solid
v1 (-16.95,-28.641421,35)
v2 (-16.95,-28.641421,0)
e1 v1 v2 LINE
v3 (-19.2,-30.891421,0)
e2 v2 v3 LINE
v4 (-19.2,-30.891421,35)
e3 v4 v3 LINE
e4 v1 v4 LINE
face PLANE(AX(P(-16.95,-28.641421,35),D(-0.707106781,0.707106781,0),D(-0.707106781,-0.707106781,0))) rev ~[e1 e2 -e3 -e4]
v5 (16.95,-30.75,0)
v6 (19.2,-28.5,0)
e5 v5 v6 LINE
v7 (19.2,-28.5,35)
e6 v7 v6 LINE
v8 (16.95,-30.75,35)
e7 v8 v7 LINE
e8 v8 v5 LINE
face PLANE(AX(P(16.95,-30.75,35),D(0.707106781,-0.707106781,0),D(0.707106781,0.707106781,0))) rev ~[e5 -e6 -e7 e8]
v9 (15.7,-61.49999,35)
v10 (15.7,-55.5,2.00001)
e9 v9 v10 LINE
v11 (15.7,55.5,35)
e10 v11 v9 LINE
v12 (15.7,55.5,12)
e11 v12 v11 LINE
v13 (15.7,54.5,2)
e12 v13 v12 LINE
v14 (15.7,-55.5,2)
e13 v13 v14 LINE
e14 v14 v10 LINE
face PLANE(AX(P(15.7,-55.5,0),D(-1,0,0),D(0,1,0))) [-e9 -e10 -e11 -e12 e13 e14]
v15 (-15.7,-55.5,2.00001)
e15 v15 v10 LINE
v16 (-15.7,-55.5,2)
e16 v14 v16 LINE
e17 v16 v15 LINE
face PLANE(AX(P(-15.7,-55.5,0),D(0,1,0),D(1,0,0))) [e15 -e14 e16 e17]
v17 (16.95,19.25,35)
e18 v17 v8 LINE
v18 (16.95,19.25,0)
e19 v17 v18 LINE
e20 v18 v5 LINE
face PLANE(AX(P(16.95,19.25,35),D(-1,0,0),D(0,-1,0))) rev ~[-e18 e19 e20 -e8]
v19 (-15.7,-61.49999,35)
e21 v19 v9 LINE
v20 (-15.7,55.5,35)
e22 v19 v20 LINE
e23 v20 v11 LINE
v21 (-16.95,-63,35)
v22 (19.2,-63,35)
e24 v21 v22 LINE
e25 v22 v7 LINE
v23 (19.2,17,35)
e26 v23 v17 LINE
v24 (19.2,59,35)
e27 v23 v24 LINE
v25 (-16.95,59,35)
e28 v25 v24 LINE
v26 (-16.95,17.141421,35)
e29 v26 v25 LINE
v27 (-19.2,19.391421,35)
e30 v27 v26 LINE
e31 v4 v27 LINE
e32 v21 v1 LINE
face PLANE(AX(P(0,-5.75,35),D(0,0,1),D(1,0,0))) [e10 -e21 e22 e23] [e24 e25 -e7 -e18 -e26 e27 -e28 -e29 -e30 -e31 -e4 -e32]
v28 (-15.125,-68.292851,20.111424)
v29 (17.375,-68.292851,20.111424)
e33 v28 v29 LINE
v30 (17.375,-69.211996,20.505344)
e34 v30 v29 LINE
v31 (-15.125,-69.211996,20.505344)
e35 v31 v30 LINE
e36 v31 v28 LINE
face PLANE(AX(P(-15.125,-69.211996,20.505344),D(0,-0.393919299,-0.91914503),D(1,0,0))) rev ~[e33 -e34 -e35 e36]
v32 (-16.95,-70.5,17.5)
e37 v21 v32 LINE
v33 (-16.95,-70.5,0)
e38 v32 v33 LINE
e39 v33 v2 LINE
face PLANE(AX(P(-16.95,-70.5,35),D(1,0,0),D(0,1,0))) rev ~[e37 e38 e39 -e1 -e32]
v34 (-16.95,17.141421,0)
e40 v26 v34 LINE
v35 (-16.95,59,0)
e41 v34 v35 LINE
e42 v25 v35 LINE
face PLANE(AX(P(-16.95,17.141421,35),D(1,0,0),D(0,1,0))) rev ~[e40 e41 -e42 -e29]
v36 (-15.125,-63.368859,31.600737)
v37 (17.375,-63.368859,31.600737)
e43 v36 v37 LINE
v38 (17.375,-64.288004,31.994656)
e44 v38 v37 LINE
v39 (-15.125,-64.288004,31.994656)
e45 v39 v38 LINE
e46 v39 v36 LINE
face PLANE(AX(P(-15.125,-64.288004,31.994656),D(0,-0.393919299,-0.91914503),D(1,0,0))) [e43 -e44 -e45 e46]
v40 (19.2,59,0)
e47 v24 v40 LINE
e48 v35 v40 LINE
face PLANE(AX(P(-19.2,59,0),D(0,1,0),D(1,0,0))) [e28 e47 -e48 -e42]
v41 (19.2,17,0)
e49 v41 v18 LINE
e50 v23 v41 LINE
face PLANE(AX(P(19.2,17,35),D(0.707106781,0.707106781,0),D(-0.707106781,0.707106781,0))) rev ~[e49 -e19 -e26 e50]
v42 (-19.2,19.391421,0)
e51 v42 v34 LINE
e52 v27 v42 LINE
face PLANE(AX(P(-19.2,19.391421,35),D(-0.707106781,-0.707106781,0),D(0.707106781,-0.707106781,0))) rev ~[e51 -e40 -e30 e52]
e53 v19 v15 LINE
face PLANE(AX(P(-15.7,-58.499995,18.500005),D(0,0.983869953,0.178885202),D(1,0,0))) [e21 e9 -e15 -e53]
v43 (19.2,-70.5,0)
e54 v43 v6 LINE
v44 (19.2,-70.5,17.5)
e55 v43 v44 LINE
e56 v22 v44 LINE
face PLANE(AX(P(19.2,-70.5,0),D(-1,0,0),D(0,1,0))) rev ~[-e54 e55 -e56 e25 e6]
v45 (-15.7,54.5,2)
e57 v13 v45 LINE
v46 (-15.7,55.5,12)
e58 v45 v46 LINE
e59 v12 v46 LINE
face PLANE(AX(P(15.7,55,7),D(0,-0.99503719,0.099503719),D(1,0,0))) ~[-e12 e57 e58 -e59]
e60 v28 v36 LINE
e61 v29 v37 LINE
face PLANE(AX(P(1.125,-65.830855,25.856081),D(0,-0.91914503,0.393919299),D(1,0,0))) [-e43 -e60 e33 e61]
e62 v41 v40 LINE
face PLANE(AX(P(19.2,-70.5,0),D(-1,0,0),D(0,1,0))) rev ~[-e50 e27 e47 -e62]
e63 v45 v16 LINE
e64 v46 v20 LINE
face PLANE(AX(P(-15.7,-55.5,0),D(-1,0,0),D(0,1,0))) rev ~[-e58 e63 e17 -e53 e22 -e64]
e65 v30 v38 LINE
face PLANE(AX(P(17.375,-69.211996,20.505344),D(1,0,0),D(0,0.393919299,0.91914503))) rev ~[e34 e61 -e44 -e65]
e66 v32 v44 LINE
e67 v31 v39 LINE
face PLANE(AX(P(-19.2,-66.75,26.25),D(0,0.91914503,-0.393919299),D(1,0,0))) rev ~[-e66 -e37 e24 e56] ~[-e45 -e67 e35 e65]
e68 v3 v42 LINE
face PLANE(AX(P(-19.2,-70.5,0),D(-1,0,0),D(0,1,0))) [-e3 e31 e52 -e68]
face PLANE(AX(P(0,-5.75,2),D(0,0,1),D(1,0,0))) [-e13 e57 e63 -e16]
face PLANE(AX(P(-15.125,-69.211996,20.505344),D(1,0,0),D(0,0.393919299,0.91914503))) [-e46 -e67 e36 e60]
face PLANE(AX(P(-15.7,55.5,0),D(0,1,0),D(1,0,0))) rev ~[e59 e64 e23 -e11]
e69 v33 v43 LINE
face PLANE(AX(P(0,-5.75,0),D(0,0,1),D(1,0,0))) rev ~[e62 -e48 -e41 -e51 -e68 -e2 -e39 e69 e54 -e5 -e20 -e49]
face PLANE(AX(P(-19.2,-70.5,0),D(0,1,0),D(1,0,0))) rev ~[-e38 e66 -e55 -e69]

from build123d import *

# Parameters (mm, degrees)
F0_W     = 38.4
F0_H     = 129.5
F0_W_2   = 31.4
F0_H_2   = 111
F1_DEPTH = 2
F2_DEPTH = 35
F3_SIZE2 = 17.5
F3_SIZE  = 7.5
F4_SIZE2 = 32.99999
F4_SIZE  = 5.99999
F6_DEPTH = 35.001
F7_W     = 32.5
F7_H     = 12.5
F8_DEPTH = 1
F9_SIZE2 = 10
F9_SIZE  = 1


# Not quite as in the source:
# - a fillet or chamfer is up to 0.001 mm smaller than in the source, because OpenCascade refuses the exact size


with BuildPart() as f1:
    # F0 (on Top) → F1 (new body)
    with BuildSketch(Plane.XY):
        with Locations((0, -5.75)):
            Rectangle(F0_W, F0_H)
        Rectangle(F0_W_2, F0_H_2, mode=Mode.SUBTRACT)
        Rectangle(F0_W_2, F0_H_2)
    extrude(amount=F1_DEPTH)

    # F0 (on Top) → F2 (join)
    with BuildSketch(Plane.XY):
        with Locations((0, -5.75)):
            Rectangle(F0_W, F0_H)
        Rectangle(F0_W_2, F0_H_2, mode=Mode.SUBTRACT)
    extrude(amount=F2_DEPTH)

    # F3
    f3_edges = [f1.edges().sort_by_distance(p)[0] for p in [
        (0, -70.5, 35),
    ]]
    f3_side = f1.faces().sort_by_distance((0, -69.149266, 35))[0]
    chamfer(f3_edges, length=F3_SIZE, length2=F3_SIZE2, reference=f3_side)

    # F4 (size 6 and 33 in the source; OpenCascade refuses exactly that, so slightly less here)
    f4_edges = [f1.edges().sort_by_distance(p)[0] for p in [
        (0, -55.5, 35),
    ]]
    f4_side = f1.faces().sort_by_distance((17.920994, -2, 35))[0]
    chamfer(f4_edges, length=F4_SIZE, length2=F4_SIZE2, reference=f4_side)

    # F5 (on face) → F6 (cut, through all)
    with BuildSketch(Plane.XY.offset(35)):
        Polygon((19.2, -28.5), (19.2, 17), (16.95, 19.25), (16.95, -30.75), align=None)
        Polygon((-19.2, 19.3914213562), (-16.95, 17.1414213562), (-16.95, 59), (-19.2, 59), align=None)
        Polygon((-16.95, -70.5), (-16.95, -28.6414213562), (-19.2, -30.8914213562), (-19.2, -70.5), align=None)
    extrude(amount=-F6_DEPTH, mode=Mode.SUBTRACT)

    # F7 (on face) → F8 (cut)
    with BuildSketch(Plane(origin=(0, -65.8965517241, 28.2413793103), x_dir=(1, 0, 0), z_dir=(0, -0.91914503, 0.3939192986))):
        with Locations((1.125, -2.1665561422)):
            Rectangle(F7_W, F7_H)
    extrude(amount=-F8_DEPTH, mode=Mode.SUBTRACT)

    # F9
    f9_edges = [f1.edges().sort_by_distance(p)[0] for p in [
        (0, 55.5, 2),
    ]]
    f9_side = f1.faces().sort_by_distance((0, 0, 2))[0]
    chamfer(f9_edges, length=F9_SIZE, length2=F9_SIZE2, reference=f9_side)


solid = f1.part
